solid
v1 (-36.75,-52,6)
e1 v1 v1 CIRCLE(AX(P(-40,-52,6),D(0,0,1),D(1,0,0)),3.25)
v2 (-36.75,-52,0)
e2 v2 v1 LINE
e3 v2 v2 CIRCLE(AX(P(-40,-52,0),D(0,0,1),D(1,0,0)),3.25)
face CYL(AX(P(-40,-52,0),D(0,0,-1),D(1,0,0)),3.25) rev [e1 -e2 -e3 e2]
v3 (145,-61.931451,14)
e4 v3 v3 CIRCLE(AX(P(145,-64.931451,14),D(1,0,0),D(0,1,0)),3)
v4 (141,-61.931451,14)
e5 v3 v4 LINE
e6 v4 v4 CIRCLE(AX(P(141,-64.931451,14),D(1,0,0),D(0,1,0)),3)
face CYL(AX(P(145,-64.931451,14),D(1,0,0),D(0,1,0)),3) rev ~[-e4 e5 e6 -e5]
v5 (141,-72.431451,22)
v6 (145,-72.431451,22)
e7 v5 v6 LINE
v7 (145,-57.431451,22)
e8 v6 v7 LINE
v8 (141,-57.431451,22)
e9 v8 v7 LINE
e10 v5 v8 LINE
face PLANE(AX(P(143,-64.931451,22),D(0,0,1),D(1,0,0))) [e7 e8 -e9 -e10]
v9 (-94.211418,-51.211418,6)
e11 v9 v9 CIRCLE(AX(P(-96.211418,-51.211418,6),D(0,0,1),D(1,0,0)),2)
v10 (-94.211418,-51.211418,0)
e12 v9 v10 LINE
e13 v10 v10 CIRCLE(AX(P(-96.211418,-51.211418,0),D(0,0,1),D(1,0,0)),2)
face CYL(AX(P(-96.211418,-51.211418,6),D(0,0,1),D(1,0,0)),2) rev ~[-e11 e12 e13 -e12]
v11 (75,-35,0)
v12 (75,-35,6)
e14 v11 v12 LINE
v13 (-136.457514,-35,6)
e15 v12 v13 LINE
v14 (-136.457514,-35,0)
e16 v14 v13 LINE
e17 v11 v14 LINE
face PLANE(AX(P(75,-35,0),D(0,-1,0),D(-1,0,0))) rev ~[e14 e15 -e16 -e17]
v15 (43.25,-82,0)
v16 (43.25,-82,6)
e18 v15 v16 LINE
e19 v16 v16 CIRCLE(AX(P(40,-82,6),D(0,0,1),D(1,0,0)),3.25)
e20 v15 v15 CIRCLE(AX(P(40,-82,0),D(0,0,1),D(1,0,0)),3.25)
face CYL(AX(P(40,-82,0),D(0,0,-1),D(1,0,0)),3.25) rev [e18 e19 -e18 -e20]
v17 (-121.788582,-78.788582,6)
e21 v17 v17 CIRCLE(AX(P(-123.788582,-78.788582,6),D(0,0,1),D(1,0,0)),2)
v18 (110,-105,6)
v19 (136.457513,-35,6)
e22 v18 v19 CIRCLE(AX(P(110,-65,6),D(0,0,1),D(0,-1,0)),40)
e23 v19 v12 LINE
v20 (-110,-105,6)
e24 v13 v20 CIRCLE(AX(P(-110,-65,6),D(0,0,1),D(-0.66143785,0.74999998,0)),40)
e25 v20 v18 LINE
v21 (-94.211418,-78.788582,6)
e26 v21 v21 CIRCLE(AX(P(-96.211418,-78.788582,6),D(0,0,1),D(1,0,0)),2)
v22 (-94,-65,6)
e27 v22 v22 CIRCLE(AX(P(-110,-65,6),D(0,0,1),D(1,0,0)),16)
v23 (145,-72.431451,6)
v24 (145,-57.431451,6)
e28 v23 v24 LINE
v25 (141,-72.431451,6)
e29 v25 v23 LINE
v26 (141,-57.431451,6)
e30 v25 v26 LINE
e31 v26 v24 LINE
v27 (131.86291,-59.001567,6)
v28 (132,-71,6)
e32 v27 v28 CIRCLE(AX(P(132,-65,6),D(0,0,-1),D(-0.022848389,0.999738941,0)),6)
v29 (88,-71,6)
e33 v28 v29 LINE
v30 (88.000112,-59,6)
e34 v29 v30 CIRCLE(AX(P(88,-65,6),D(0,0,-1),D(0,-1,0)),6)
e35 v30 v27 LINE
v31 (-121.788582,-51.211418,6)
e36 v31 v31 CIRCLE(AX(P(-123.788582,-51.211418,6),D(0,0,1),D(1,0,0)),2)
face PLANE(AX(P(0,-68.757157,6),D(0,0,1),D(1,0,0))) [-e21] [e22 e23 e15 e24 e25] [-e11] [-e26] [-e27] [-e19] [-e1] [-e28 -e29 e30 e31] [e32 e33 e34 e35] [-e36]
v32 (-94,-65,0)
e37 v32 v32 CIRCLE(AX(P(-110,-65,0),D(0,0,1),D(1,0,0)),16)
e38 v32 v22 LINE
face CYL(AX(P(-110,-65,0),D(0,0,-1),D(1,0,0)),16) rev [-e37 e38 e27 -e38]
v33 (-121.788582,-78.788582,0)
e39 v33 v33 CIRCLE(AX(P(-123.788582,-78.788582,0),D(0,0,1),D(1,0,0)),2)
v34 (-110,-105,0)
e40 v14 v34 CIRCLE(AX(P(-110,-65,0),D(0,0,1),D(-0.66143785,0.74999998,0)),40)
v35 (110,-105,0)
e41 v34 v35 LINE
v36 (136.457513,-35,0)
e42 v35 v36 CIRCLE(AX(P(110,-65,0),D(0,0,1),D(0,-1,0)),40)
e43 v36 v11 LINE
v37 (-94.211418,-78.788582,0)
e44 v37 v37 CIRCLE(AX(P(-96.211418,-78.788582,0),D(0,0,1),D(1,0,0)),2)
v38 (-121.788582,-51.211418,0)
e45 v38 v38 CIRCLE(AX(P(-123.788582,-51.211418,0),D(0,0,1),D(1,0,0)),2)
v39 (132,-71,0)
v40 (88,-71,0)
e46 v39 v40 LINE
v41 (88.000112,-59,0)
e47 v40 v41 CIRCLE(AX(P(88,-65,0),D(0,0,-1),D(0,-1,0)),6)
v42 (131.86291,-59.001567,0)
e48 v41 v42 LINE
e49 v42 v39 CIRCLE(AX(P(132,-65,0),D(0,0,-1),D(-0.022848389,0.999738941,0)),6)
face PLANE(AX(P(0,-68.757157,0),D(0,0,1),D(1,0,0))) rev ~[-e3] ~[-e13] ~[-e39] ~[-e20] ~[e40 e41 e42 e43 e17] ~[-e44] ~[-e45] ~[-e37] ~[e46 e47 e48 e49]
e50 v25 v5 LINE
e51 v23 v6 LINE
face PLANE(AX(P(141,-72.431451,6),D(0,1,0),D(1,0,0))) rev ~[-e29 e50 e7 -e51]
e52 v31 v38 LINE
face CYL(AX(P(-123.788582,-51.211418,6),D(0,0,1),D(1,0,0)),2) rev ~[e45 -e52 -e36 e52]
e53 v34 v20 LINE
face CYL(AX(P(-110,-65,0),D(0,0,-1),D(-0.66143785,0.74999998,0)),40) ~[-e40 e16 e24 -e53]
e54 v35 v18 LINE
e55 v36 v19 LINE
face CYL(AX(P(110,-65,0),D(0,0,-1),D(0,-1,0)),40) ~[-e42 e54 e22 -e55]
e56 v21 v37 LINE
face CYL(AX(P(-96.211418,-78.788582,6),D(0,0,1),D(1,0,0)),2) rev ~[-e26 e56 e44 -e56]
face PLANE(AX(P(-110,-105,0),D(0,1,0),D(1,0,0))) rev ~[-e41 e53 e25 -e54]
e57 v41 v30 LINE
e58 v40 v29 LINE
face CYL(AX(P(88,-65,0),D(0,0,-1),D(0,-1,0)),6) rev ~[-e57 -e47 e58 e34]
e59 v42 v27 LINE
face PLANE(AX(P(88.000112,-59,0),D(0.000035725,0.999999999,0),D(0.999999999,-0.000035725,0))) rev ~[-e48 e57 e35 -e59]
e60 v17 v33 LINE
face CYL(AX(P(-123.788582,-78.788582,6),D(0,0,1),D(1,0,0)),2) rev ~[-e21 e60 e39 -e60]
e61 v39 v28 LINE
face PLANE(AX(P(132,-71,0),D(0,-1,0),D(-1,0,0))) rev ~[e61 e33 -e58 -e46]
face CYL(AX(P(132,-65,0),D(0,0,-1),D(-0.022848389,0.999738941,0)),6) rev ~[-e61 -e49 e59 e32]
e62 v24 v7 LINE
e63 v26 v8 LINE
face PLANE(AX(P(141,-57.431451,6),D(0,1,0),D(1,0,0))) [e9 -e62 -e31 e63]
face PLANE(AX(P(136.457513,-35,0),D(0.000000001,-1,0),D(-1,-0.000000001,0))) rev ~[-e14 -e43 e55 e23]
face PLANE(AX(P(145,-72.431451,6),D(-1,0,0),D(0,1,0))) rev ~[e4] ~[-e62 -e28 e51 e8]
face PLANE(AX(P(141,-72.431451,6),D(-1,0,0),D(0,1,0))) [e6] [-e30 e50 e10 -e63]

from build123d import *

# Parameters (mm, degrees)
F0_R     = 3.25
F0_R_2   = 16
F1_DEPTH = 6
F2_W     = 4
F2_H     = 15
F3_DEPTH = 16
F4_R     = 3
F5_DEPTH = 25
F6_R     = 2
F7_DEPTH = 25


# Not quite as in the source:
# - ends of sketch curves that miss each other by under 0.0002 mm in the source are joined


with BuildPart() as f1:
    # F0 (on Top) → F1 (new body)
    with BuildSketch(Plane.XY):
        with BuildLine():
            ThreePointArc((110, -105), (147.4165738824, -79.1421355849), (136.4575130484, -34.9999999451))
            Line((136.4575130484, -34.9999999451), (75, -35))
            Line((75, -35), (-75, -35))
            Line((-75, -35), (-136.457514, -35))
            ThreePointArc((-136.457514, -35), (-147.4165737498, -79.1421359357), (-110, -105))
            Line((-110, -105), (-75, -105))
            Line((-75, -105), (75, -105))
            Line((75, -105), (110, -105))
        make_face()
        with Locations((40, -82)):
            Circle(F0_R, mode=Mode.SUBTRACT)
        with Locations((-110, -65)):
            Circle(F0_R_2, mode=Mode.SUBTRACT)
        with Locations((-40, -52)):
            Circle(F0_R, mode=Mode.SUBTRACT)
        with BuildLine():
            Line((88.000112, -59), (131.86291, -59.001567))
            ThreePointArc((131.86291, -59.001567), (137.9996084013, -64.9314505185), (132, -71))
            Line((132, -71), (88, -71))
            ThreePointArc((88, -71), (82.0000000003, -64.999944), (88.000112, -59))
        make_face(mode=Mode.SUBTRACT)
    extrude(amount=F1_DEPTH)

    # F2 (on face) → F3 (join)
    with BuildSketch(Plane.XY.offset(6)):
        with Locations((143, -64.9314505185)):
            Rectangle(F2_W, F2_H)
    extrude(amount=F3_DEPTH)

    # F4 (on face) → F5 (cut)
    with BuildSketch(Plane.YZ.offset(145)):
        with Locations((-64.9314505185, 14)):
            Circle(F4_R)
    extrude(amount=-F5_DEPTH, mode=Mode.SUBTRACT)

    # F6 (on face) → F7 (cut)
    with BuildSketch(Plane.XY.offset(6)):
        with Locations((-123.7885822331, -51.2114177669)):
            Circle(F6_R)
        with Locations((-96.2114177669, -51.2114177669)):
            Circle(F6_R)
        with Locations((-96.2114177669, -78.7885822331)):
            Circle(F6_R)
        with Locations((-123.7885822331, -78.7885822331)):
            Circle(F6_R)
    extrude(amount=-F7_DEPTH, mode=Mode.SUBTRACT)


solid = f1.part
